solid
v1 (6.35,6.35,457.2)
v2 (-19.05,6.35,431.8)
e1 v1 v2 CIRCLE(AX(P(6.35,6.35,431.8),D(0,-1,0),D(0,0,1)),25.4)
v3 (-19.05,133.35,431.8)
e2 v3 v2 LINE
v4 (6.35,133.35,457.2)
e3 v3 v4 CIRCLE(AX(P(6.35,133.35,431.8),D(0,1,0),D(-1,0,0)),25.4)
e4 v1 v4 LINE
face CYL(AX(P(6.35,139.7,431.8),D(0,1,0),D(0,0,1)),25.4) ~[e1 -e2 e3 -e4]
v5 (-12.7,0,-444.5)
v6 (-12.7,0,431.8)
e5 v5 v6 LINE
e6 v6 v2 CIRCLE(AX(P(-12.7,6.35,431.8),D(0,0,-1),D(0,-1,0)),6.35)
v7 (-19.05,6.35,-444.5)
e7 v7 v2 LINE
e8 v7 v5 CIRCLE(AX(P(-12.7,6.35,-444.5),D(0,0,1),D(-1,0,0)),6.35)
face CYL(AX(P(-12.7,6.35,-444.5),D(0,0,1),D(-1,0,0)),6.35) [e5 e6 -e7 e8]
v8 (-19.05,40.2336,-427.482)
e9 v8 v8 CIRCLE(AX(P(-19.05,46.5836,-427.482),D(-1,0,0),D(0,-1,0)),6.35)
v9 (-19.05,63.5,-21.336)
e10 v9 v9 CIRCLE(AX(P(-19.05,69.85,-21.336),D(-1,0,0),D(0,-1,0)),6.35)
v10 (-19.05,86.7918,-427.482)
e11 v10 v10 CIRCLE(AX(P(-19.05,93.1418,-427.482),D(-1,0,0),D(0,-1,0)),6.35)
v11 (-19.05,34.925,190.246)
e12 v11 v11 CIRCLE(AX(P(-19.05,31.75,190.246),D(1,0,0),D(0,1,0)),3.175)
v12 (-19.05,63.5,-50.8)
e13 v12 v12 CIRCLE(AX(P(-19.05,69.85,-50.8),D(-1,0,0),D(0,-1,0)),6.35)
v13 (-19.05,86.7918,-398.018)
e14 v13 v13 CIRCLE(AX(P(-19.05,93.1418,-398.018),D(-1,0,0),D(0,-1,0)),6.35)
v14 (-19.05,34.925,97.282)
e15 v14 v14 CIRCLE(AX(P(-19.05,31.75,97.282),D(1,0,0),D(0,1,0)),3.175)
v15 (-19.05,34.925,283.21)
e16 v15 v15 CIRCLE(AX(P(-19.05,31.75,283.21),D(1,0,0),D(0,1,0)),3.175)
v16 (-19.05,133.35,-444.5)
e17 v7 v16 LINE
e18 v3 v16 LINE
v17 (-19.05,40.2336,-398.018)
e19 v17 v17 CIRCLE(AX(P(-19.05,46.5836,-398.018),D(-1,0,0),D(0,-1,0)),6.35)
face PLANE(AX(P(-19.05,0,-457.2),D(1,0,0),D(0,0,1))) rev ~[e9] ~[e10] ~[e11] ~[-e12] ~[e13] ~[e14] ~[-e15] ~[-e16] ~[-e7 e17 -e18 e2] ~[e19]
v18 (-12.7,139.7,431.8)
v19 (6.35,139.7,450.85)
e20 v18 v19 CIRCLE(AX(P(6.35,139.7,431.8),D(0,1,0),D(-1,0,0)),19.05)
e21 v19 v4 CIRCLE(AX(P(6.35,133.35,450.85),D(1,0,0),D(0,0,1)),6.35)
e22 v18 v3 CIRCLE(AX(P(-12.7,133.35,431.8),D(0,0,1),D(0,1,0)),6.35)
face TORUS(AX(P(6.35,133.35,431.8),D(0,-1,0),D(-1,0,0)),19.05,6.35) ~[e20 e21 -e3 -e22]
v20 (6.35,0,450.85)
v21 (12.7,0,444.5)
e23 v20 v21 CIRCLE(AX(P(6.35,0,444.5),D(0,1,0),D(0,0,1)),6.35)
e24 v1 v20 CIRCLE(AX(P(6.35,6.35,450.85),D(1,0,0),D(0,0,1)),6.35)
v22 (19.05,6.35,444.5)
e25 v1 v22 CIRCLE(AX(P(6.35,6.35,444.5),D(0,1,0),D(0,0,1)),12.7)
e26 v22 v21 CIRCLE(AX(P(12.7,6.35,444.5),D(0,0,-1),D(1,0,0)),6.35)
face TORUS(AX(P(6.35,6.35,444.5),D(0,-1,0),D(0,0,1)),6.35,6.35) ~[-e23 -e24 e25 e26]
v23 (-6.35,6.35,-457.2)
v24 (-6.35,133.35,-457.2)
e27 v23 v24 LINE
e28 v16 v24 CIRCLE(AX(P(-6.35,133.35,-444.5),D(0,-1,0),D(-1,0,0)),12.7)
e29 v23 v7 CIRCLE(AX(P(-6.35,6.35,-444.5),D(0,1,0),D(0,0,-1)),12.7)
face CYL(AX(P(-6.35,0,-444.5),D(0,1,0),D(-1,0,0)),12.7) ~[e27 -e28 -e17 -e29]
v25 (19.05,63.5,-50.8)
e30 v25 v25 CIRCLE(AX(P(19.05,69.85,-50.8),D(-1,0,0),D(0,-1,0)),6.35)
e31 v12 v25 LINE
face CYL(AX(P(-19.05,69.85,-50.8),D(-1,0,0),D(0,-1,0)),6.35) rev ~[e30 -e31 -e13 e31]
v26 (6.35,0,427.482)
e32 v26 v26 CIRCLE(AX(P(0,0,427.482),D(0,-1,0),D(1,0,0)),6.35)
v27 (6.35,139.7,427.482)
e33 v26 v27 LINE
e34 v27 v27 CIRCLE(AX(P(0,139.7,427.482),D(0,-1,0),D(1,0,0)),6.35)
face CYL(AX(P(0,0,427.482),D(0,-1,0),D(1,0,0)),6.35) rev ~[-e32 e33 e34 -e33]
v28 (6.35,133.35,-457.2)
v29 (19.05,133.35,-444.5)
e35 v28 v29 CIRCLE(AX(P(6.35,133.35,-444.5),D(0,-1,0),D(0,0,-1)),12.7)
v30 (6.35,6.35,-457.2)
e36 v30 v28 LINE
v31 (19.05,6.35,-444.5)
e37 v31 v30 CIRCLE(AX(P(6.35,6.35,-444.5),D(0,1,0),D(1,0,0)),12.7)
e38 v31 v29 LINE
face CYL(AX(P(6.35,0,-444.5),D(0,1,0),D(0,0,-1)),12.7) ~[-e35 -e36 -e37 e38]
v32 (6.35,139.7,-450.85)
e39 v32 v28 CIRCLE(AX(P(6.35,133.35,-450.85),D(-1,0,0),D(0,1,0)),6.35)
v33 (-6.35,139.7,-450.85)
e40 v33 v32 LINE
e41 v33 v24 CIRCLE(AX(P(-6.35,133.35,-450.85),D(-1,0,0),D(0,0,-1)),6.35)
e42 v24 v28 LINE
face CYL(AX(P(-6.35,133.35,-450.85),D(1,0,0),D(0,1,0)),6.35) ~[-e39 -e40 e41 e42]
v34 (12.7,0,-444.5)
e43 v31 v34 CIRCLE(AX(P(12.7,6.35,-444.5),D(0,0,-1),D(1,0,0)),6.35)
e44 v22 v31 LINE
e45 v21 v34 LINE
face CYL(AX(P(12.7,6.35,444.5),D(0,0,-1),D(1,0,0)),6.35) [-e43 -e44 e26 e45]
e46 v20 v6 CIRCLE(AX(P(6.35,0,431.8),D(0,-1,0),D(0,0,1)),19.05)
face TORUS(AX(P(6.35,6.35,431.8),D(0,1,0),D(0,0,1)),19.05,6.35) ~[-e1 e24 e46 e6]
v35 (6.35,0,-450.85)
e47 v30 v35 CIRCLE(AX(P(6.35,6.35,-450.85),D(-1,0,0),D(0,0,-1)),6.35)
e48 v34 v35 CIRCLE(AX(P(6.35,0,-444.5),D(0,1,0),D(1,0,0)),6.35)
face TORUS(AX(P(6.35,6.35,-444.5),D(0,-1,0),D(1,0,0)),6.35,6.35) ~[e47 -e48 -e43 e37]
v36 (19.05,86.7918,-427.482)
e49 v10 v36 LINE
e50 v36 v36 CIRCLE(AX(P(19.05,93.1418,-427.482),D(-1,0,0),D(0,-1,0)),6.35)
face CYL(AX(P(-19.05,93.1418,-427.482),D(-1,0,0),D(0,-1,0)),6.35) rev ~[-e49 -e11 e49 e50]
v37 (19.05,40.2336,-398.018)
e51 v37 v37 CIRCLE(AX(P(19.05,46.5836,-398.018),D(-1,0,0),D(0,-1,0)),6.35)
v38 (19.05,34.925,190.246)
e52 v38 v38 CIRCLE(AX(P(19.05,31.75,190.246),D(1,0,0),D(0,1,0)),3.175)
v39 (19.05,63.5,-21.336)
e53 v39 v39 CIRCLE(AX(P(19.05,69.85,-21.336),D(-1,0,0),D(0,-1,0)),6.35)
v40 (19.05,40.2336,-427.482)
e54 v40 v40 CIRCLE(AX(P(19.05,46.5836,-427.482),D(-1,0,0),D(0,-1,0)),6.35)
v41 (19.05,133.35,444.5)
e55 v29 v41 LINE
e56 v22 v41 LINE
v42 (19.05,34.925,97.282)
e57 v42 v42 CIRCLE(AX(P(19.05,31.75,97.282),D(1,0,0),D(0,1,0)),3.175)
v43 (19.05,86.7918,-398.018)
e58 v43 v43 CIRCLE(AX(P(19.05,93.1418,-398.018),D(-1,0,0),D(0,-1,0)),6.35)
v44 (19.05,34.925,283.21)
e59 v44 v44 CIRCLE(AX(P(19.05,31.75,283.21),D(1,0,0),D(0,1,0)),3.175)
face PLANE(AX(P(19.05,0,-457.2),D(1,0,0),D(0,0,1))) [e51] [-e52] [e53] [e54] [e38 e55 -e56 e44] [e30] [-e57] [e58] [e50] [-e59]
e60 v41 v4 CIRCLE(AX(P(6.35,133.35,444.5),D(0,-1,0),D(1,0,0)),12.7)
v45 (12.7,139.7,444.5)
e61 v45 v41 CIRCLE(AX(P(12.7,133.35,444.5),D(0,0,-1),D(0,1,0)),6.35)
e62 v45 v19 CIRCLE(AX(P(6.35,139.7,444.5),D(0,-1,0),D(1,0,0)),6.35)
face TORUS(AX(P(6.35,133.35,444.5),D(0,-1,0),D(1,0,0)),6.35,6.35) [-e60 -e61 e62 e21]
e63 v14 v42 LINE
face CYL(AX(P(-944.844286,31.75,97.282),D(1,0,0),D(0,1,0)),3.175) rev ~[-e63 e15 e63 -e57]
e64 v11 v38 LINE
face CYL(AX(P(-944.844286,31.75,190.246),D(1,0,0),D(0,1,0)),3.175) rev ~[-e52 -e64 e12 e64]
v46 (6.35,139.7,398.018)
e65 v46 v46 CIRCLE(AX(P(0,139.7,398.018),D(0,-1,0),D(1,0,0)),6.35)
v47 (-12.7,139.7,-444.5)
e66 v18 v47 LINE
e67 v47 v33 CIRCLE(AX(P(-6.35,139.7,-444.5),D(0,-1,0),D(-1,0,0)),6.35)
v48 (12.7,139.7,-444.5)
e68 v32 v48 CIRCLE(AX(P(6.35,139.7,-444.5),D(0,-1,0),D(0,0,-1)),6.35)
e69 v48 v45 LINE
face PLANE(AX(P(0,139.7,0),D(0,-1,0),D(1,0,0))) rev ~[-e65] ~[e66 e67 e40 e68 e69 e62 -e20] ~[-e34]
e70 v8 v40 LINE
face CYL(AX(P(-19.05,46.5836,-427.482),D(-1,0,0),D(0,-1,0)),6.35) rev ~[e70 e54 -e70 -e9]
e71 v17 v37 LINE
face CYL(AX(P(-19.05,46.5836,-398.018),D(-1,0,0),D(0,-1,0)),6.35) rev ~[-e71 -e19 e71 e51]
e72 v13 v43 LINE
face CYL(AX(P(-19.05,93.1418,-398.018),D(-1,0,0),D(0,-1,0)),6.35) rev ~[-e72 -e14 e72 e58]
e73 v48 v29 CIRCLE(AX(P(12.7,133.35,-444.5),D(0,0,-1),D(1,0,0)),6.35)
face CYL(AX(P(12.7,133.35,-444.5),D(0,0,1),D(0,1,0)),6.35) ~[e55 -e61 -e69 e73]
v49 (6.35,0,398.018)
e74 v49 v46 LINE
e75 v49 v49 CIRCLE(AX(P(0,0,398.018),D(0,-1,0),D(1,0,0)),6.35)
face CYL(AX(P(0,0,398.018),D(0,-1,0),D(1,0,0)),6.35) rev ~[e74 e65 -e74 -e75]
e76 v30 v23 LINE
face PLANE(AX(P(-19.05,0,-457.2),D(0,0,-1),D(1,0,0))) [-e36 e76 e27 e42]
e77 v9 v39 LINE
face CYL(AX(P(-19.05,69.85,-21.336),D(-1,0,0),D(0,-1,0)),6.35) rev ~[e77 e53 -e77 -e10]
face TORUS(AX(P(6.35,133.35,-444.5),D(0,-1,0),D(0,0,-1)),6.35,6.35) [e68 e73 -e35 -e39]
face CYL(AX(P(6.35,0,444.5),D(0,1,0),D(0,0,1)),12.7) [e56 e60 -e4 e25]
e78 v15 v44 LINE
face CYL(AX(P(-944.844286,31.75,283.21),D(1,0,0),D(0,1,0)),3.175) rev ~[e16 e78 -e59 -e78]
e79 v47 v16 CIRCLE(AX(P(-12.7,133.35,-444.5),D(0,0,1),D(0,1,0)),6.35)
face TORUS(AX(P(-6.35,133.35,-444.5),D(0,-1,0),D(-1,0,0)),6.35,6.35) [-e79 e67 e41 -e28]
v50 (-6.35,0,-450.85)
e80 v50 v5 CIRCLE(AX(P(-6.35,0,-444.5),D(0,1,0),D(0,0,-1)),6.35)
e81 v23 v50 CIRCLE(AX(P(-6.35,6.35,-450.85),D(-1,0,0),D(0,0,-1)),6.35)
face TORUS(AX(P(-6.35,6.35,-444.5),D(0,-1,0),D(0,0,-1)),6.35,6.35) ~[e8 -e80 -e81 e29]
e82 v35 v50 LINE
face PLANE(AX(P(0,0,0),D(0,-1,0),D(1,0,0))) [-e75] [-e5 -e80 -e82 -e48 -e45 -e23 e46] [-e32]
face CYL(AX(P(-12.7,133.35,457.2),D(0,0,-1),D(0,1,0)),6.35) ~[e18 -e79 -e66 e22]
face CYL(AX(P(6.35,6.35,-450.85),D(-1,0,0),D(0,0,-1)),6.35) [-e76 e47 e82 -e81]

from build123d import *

# Parameters (mm, degrees)
F0_W        = 38.1
F0_H        = 914.4
F0_R        = 6.35
F1_DEPTH    = 139.7
F2_R        = 6.35
F3_DEPTH    = 38.1
F6_R        = 6.35
F7_DEPTH    = 38.1
F8_D        = 6.35
F4_R        = 12.7
F5_R        = 6.35
F9_T1_DEPTH = 139.7
F9_T4_ANGLE = 90
F9_T6_ANGLE = 90


# Not quite as in the source:
# - a fillet or chamfer that OpenCascade refuses, or shapes differently, is made with other operations: its cross-section is extruded or revolved along the edge and cut away or added


with BuildPart() as f1:
    # F0 (on Front) → F1 (new body)
    with BuildSketch(Plane.XZ):
        Rectangle(F0_W, F0_H)
        with Locations((0, 398.018)):
            Circle(F0_R, mode=Mode.SUBTRACT)
        with Locations((0, 427.482)):
            Circle(F0_R, mode=Mode.SUBTRACT)
    extrude(amount=-F1_DEPTH)

    # F2 (on face) → F3 (cut)
    with BuildSketch(Plane(origin=(-19.05, 0, 0), x_dir=(0, -1, 0), z_dir=(-1, 0, 0))):
        with Locations((-93.1418, -427.482)):
            Circle(F2_R)
        with Locations((-93.1418, -398.018)):
            Circle(F2_R)
        with Locations((-46.5836, -427.482)):
            Circle(F2_R)
        with Locations((-46.5836, -398.018)):
            Circle(F2_R)
    extrude(amount=-F3_DEPTH, mode=Mode.SUBTRACT)

    # F6 (on face) → F7 (cut)
    with BuildSketch(Plane(origin=(-19.05, 0, 0), x_dir=(0, -1, 0), z_dir=(-1, 0, 0))):
        with Locations((-69.85, -21.336)):
            Circle(F6_R)
        with Locations((-69.85, -50.8)):
            Circle(F6_R)
    extrude(amount=-F7_DEPTH, mode=Mode.SUBTRACT)

    # F8 (through all)
    with Locations(Plane(origin=(-19.05, 0, 0), x_dir=(0, -1, 0), z_dir=(-1, 0, 0))):
        with Locations((-31.75, 283.21), (-31.75, 190.246), (-31.75, 97.282)):
            Hole(F8_D / 2)

    # F4
    f4_edges = [f1.edges().sort_by_distance(p)[0] for p in [
        (19.05, 69.85, 457.2),
        (-19.05, 69.85, -457.2),
        (19.05, 69.85, -457.2),
    ]]
    fillet(f4_edges, radius=F4_R)

    # F5
    f5_edges = [f1.edges().sort_by_distance(p)[0] for p in [
        (-19.05, 0, 6.35),
        (19.05, 0, 0),
        (19.05, 139.7, 0),
    ]]
    fillet(f5_edges, radius=F5_R)

    # F9: fillet of radius 25.4 on 1 edges, made by hand

    # F9_s2 → F9_t1 (cut)
    with BuildSketch(Plane.XZ.offset(-139.7)):
        with BuildLine():
            ThreePointArc((6.35, 457.2), (-11.6105122421, 449.7605122421), (-19.05, 431.8))
            Line((-19.05, 431.8), (-19.05, 457.2))
            Line((-19.05, 457.2), (6.35, 457.2))
        make_face()
    extrude(amount=F9_T1_DEPTH, mode=Mode.SUBTRACT)

    # F9_s3 → F9_t4 (revolve, cut)
    with BuildSketch(Plane.YZ.offset(6.35)):
        with BuildLine():
            ThreePointArc((0, 450.85), (1.8598719395, 455.3401280605), (6.35, 457.2))
            Line((6.35, 457.2), (0, 457.2))
            Line((0, 457.2), (0, 450.85))
        make_face()
    revolve(axis=Axis((6.35, 0, 431.8), (0, -1, 0)), revolution_arc=F9_T4_ANGLE, mode=Mode.SUBTRACT)

    # F9_s5 → F9_t6 (revolve, cut)
    with BuildSketch(Plane.XY.offset(431.8)):
        with BuildLine():
            ThreePointArc((-12.7, 139.7), (-17.1901280605, 137.8401280605), (-19.05, 133.35))
            Line((-19.05, 133.35), (-19.05, 139.7))
            Line((-19.05, 139.7), (-12.7, 139.7))
        make_face()
    revolve(axis=Axis((6.35, 139.7, 431.8), (0, 1, 0)), revolution_arc=F9_T6_ANGLE, mode=Mode.SUBTRACT)


solid = f1.part
